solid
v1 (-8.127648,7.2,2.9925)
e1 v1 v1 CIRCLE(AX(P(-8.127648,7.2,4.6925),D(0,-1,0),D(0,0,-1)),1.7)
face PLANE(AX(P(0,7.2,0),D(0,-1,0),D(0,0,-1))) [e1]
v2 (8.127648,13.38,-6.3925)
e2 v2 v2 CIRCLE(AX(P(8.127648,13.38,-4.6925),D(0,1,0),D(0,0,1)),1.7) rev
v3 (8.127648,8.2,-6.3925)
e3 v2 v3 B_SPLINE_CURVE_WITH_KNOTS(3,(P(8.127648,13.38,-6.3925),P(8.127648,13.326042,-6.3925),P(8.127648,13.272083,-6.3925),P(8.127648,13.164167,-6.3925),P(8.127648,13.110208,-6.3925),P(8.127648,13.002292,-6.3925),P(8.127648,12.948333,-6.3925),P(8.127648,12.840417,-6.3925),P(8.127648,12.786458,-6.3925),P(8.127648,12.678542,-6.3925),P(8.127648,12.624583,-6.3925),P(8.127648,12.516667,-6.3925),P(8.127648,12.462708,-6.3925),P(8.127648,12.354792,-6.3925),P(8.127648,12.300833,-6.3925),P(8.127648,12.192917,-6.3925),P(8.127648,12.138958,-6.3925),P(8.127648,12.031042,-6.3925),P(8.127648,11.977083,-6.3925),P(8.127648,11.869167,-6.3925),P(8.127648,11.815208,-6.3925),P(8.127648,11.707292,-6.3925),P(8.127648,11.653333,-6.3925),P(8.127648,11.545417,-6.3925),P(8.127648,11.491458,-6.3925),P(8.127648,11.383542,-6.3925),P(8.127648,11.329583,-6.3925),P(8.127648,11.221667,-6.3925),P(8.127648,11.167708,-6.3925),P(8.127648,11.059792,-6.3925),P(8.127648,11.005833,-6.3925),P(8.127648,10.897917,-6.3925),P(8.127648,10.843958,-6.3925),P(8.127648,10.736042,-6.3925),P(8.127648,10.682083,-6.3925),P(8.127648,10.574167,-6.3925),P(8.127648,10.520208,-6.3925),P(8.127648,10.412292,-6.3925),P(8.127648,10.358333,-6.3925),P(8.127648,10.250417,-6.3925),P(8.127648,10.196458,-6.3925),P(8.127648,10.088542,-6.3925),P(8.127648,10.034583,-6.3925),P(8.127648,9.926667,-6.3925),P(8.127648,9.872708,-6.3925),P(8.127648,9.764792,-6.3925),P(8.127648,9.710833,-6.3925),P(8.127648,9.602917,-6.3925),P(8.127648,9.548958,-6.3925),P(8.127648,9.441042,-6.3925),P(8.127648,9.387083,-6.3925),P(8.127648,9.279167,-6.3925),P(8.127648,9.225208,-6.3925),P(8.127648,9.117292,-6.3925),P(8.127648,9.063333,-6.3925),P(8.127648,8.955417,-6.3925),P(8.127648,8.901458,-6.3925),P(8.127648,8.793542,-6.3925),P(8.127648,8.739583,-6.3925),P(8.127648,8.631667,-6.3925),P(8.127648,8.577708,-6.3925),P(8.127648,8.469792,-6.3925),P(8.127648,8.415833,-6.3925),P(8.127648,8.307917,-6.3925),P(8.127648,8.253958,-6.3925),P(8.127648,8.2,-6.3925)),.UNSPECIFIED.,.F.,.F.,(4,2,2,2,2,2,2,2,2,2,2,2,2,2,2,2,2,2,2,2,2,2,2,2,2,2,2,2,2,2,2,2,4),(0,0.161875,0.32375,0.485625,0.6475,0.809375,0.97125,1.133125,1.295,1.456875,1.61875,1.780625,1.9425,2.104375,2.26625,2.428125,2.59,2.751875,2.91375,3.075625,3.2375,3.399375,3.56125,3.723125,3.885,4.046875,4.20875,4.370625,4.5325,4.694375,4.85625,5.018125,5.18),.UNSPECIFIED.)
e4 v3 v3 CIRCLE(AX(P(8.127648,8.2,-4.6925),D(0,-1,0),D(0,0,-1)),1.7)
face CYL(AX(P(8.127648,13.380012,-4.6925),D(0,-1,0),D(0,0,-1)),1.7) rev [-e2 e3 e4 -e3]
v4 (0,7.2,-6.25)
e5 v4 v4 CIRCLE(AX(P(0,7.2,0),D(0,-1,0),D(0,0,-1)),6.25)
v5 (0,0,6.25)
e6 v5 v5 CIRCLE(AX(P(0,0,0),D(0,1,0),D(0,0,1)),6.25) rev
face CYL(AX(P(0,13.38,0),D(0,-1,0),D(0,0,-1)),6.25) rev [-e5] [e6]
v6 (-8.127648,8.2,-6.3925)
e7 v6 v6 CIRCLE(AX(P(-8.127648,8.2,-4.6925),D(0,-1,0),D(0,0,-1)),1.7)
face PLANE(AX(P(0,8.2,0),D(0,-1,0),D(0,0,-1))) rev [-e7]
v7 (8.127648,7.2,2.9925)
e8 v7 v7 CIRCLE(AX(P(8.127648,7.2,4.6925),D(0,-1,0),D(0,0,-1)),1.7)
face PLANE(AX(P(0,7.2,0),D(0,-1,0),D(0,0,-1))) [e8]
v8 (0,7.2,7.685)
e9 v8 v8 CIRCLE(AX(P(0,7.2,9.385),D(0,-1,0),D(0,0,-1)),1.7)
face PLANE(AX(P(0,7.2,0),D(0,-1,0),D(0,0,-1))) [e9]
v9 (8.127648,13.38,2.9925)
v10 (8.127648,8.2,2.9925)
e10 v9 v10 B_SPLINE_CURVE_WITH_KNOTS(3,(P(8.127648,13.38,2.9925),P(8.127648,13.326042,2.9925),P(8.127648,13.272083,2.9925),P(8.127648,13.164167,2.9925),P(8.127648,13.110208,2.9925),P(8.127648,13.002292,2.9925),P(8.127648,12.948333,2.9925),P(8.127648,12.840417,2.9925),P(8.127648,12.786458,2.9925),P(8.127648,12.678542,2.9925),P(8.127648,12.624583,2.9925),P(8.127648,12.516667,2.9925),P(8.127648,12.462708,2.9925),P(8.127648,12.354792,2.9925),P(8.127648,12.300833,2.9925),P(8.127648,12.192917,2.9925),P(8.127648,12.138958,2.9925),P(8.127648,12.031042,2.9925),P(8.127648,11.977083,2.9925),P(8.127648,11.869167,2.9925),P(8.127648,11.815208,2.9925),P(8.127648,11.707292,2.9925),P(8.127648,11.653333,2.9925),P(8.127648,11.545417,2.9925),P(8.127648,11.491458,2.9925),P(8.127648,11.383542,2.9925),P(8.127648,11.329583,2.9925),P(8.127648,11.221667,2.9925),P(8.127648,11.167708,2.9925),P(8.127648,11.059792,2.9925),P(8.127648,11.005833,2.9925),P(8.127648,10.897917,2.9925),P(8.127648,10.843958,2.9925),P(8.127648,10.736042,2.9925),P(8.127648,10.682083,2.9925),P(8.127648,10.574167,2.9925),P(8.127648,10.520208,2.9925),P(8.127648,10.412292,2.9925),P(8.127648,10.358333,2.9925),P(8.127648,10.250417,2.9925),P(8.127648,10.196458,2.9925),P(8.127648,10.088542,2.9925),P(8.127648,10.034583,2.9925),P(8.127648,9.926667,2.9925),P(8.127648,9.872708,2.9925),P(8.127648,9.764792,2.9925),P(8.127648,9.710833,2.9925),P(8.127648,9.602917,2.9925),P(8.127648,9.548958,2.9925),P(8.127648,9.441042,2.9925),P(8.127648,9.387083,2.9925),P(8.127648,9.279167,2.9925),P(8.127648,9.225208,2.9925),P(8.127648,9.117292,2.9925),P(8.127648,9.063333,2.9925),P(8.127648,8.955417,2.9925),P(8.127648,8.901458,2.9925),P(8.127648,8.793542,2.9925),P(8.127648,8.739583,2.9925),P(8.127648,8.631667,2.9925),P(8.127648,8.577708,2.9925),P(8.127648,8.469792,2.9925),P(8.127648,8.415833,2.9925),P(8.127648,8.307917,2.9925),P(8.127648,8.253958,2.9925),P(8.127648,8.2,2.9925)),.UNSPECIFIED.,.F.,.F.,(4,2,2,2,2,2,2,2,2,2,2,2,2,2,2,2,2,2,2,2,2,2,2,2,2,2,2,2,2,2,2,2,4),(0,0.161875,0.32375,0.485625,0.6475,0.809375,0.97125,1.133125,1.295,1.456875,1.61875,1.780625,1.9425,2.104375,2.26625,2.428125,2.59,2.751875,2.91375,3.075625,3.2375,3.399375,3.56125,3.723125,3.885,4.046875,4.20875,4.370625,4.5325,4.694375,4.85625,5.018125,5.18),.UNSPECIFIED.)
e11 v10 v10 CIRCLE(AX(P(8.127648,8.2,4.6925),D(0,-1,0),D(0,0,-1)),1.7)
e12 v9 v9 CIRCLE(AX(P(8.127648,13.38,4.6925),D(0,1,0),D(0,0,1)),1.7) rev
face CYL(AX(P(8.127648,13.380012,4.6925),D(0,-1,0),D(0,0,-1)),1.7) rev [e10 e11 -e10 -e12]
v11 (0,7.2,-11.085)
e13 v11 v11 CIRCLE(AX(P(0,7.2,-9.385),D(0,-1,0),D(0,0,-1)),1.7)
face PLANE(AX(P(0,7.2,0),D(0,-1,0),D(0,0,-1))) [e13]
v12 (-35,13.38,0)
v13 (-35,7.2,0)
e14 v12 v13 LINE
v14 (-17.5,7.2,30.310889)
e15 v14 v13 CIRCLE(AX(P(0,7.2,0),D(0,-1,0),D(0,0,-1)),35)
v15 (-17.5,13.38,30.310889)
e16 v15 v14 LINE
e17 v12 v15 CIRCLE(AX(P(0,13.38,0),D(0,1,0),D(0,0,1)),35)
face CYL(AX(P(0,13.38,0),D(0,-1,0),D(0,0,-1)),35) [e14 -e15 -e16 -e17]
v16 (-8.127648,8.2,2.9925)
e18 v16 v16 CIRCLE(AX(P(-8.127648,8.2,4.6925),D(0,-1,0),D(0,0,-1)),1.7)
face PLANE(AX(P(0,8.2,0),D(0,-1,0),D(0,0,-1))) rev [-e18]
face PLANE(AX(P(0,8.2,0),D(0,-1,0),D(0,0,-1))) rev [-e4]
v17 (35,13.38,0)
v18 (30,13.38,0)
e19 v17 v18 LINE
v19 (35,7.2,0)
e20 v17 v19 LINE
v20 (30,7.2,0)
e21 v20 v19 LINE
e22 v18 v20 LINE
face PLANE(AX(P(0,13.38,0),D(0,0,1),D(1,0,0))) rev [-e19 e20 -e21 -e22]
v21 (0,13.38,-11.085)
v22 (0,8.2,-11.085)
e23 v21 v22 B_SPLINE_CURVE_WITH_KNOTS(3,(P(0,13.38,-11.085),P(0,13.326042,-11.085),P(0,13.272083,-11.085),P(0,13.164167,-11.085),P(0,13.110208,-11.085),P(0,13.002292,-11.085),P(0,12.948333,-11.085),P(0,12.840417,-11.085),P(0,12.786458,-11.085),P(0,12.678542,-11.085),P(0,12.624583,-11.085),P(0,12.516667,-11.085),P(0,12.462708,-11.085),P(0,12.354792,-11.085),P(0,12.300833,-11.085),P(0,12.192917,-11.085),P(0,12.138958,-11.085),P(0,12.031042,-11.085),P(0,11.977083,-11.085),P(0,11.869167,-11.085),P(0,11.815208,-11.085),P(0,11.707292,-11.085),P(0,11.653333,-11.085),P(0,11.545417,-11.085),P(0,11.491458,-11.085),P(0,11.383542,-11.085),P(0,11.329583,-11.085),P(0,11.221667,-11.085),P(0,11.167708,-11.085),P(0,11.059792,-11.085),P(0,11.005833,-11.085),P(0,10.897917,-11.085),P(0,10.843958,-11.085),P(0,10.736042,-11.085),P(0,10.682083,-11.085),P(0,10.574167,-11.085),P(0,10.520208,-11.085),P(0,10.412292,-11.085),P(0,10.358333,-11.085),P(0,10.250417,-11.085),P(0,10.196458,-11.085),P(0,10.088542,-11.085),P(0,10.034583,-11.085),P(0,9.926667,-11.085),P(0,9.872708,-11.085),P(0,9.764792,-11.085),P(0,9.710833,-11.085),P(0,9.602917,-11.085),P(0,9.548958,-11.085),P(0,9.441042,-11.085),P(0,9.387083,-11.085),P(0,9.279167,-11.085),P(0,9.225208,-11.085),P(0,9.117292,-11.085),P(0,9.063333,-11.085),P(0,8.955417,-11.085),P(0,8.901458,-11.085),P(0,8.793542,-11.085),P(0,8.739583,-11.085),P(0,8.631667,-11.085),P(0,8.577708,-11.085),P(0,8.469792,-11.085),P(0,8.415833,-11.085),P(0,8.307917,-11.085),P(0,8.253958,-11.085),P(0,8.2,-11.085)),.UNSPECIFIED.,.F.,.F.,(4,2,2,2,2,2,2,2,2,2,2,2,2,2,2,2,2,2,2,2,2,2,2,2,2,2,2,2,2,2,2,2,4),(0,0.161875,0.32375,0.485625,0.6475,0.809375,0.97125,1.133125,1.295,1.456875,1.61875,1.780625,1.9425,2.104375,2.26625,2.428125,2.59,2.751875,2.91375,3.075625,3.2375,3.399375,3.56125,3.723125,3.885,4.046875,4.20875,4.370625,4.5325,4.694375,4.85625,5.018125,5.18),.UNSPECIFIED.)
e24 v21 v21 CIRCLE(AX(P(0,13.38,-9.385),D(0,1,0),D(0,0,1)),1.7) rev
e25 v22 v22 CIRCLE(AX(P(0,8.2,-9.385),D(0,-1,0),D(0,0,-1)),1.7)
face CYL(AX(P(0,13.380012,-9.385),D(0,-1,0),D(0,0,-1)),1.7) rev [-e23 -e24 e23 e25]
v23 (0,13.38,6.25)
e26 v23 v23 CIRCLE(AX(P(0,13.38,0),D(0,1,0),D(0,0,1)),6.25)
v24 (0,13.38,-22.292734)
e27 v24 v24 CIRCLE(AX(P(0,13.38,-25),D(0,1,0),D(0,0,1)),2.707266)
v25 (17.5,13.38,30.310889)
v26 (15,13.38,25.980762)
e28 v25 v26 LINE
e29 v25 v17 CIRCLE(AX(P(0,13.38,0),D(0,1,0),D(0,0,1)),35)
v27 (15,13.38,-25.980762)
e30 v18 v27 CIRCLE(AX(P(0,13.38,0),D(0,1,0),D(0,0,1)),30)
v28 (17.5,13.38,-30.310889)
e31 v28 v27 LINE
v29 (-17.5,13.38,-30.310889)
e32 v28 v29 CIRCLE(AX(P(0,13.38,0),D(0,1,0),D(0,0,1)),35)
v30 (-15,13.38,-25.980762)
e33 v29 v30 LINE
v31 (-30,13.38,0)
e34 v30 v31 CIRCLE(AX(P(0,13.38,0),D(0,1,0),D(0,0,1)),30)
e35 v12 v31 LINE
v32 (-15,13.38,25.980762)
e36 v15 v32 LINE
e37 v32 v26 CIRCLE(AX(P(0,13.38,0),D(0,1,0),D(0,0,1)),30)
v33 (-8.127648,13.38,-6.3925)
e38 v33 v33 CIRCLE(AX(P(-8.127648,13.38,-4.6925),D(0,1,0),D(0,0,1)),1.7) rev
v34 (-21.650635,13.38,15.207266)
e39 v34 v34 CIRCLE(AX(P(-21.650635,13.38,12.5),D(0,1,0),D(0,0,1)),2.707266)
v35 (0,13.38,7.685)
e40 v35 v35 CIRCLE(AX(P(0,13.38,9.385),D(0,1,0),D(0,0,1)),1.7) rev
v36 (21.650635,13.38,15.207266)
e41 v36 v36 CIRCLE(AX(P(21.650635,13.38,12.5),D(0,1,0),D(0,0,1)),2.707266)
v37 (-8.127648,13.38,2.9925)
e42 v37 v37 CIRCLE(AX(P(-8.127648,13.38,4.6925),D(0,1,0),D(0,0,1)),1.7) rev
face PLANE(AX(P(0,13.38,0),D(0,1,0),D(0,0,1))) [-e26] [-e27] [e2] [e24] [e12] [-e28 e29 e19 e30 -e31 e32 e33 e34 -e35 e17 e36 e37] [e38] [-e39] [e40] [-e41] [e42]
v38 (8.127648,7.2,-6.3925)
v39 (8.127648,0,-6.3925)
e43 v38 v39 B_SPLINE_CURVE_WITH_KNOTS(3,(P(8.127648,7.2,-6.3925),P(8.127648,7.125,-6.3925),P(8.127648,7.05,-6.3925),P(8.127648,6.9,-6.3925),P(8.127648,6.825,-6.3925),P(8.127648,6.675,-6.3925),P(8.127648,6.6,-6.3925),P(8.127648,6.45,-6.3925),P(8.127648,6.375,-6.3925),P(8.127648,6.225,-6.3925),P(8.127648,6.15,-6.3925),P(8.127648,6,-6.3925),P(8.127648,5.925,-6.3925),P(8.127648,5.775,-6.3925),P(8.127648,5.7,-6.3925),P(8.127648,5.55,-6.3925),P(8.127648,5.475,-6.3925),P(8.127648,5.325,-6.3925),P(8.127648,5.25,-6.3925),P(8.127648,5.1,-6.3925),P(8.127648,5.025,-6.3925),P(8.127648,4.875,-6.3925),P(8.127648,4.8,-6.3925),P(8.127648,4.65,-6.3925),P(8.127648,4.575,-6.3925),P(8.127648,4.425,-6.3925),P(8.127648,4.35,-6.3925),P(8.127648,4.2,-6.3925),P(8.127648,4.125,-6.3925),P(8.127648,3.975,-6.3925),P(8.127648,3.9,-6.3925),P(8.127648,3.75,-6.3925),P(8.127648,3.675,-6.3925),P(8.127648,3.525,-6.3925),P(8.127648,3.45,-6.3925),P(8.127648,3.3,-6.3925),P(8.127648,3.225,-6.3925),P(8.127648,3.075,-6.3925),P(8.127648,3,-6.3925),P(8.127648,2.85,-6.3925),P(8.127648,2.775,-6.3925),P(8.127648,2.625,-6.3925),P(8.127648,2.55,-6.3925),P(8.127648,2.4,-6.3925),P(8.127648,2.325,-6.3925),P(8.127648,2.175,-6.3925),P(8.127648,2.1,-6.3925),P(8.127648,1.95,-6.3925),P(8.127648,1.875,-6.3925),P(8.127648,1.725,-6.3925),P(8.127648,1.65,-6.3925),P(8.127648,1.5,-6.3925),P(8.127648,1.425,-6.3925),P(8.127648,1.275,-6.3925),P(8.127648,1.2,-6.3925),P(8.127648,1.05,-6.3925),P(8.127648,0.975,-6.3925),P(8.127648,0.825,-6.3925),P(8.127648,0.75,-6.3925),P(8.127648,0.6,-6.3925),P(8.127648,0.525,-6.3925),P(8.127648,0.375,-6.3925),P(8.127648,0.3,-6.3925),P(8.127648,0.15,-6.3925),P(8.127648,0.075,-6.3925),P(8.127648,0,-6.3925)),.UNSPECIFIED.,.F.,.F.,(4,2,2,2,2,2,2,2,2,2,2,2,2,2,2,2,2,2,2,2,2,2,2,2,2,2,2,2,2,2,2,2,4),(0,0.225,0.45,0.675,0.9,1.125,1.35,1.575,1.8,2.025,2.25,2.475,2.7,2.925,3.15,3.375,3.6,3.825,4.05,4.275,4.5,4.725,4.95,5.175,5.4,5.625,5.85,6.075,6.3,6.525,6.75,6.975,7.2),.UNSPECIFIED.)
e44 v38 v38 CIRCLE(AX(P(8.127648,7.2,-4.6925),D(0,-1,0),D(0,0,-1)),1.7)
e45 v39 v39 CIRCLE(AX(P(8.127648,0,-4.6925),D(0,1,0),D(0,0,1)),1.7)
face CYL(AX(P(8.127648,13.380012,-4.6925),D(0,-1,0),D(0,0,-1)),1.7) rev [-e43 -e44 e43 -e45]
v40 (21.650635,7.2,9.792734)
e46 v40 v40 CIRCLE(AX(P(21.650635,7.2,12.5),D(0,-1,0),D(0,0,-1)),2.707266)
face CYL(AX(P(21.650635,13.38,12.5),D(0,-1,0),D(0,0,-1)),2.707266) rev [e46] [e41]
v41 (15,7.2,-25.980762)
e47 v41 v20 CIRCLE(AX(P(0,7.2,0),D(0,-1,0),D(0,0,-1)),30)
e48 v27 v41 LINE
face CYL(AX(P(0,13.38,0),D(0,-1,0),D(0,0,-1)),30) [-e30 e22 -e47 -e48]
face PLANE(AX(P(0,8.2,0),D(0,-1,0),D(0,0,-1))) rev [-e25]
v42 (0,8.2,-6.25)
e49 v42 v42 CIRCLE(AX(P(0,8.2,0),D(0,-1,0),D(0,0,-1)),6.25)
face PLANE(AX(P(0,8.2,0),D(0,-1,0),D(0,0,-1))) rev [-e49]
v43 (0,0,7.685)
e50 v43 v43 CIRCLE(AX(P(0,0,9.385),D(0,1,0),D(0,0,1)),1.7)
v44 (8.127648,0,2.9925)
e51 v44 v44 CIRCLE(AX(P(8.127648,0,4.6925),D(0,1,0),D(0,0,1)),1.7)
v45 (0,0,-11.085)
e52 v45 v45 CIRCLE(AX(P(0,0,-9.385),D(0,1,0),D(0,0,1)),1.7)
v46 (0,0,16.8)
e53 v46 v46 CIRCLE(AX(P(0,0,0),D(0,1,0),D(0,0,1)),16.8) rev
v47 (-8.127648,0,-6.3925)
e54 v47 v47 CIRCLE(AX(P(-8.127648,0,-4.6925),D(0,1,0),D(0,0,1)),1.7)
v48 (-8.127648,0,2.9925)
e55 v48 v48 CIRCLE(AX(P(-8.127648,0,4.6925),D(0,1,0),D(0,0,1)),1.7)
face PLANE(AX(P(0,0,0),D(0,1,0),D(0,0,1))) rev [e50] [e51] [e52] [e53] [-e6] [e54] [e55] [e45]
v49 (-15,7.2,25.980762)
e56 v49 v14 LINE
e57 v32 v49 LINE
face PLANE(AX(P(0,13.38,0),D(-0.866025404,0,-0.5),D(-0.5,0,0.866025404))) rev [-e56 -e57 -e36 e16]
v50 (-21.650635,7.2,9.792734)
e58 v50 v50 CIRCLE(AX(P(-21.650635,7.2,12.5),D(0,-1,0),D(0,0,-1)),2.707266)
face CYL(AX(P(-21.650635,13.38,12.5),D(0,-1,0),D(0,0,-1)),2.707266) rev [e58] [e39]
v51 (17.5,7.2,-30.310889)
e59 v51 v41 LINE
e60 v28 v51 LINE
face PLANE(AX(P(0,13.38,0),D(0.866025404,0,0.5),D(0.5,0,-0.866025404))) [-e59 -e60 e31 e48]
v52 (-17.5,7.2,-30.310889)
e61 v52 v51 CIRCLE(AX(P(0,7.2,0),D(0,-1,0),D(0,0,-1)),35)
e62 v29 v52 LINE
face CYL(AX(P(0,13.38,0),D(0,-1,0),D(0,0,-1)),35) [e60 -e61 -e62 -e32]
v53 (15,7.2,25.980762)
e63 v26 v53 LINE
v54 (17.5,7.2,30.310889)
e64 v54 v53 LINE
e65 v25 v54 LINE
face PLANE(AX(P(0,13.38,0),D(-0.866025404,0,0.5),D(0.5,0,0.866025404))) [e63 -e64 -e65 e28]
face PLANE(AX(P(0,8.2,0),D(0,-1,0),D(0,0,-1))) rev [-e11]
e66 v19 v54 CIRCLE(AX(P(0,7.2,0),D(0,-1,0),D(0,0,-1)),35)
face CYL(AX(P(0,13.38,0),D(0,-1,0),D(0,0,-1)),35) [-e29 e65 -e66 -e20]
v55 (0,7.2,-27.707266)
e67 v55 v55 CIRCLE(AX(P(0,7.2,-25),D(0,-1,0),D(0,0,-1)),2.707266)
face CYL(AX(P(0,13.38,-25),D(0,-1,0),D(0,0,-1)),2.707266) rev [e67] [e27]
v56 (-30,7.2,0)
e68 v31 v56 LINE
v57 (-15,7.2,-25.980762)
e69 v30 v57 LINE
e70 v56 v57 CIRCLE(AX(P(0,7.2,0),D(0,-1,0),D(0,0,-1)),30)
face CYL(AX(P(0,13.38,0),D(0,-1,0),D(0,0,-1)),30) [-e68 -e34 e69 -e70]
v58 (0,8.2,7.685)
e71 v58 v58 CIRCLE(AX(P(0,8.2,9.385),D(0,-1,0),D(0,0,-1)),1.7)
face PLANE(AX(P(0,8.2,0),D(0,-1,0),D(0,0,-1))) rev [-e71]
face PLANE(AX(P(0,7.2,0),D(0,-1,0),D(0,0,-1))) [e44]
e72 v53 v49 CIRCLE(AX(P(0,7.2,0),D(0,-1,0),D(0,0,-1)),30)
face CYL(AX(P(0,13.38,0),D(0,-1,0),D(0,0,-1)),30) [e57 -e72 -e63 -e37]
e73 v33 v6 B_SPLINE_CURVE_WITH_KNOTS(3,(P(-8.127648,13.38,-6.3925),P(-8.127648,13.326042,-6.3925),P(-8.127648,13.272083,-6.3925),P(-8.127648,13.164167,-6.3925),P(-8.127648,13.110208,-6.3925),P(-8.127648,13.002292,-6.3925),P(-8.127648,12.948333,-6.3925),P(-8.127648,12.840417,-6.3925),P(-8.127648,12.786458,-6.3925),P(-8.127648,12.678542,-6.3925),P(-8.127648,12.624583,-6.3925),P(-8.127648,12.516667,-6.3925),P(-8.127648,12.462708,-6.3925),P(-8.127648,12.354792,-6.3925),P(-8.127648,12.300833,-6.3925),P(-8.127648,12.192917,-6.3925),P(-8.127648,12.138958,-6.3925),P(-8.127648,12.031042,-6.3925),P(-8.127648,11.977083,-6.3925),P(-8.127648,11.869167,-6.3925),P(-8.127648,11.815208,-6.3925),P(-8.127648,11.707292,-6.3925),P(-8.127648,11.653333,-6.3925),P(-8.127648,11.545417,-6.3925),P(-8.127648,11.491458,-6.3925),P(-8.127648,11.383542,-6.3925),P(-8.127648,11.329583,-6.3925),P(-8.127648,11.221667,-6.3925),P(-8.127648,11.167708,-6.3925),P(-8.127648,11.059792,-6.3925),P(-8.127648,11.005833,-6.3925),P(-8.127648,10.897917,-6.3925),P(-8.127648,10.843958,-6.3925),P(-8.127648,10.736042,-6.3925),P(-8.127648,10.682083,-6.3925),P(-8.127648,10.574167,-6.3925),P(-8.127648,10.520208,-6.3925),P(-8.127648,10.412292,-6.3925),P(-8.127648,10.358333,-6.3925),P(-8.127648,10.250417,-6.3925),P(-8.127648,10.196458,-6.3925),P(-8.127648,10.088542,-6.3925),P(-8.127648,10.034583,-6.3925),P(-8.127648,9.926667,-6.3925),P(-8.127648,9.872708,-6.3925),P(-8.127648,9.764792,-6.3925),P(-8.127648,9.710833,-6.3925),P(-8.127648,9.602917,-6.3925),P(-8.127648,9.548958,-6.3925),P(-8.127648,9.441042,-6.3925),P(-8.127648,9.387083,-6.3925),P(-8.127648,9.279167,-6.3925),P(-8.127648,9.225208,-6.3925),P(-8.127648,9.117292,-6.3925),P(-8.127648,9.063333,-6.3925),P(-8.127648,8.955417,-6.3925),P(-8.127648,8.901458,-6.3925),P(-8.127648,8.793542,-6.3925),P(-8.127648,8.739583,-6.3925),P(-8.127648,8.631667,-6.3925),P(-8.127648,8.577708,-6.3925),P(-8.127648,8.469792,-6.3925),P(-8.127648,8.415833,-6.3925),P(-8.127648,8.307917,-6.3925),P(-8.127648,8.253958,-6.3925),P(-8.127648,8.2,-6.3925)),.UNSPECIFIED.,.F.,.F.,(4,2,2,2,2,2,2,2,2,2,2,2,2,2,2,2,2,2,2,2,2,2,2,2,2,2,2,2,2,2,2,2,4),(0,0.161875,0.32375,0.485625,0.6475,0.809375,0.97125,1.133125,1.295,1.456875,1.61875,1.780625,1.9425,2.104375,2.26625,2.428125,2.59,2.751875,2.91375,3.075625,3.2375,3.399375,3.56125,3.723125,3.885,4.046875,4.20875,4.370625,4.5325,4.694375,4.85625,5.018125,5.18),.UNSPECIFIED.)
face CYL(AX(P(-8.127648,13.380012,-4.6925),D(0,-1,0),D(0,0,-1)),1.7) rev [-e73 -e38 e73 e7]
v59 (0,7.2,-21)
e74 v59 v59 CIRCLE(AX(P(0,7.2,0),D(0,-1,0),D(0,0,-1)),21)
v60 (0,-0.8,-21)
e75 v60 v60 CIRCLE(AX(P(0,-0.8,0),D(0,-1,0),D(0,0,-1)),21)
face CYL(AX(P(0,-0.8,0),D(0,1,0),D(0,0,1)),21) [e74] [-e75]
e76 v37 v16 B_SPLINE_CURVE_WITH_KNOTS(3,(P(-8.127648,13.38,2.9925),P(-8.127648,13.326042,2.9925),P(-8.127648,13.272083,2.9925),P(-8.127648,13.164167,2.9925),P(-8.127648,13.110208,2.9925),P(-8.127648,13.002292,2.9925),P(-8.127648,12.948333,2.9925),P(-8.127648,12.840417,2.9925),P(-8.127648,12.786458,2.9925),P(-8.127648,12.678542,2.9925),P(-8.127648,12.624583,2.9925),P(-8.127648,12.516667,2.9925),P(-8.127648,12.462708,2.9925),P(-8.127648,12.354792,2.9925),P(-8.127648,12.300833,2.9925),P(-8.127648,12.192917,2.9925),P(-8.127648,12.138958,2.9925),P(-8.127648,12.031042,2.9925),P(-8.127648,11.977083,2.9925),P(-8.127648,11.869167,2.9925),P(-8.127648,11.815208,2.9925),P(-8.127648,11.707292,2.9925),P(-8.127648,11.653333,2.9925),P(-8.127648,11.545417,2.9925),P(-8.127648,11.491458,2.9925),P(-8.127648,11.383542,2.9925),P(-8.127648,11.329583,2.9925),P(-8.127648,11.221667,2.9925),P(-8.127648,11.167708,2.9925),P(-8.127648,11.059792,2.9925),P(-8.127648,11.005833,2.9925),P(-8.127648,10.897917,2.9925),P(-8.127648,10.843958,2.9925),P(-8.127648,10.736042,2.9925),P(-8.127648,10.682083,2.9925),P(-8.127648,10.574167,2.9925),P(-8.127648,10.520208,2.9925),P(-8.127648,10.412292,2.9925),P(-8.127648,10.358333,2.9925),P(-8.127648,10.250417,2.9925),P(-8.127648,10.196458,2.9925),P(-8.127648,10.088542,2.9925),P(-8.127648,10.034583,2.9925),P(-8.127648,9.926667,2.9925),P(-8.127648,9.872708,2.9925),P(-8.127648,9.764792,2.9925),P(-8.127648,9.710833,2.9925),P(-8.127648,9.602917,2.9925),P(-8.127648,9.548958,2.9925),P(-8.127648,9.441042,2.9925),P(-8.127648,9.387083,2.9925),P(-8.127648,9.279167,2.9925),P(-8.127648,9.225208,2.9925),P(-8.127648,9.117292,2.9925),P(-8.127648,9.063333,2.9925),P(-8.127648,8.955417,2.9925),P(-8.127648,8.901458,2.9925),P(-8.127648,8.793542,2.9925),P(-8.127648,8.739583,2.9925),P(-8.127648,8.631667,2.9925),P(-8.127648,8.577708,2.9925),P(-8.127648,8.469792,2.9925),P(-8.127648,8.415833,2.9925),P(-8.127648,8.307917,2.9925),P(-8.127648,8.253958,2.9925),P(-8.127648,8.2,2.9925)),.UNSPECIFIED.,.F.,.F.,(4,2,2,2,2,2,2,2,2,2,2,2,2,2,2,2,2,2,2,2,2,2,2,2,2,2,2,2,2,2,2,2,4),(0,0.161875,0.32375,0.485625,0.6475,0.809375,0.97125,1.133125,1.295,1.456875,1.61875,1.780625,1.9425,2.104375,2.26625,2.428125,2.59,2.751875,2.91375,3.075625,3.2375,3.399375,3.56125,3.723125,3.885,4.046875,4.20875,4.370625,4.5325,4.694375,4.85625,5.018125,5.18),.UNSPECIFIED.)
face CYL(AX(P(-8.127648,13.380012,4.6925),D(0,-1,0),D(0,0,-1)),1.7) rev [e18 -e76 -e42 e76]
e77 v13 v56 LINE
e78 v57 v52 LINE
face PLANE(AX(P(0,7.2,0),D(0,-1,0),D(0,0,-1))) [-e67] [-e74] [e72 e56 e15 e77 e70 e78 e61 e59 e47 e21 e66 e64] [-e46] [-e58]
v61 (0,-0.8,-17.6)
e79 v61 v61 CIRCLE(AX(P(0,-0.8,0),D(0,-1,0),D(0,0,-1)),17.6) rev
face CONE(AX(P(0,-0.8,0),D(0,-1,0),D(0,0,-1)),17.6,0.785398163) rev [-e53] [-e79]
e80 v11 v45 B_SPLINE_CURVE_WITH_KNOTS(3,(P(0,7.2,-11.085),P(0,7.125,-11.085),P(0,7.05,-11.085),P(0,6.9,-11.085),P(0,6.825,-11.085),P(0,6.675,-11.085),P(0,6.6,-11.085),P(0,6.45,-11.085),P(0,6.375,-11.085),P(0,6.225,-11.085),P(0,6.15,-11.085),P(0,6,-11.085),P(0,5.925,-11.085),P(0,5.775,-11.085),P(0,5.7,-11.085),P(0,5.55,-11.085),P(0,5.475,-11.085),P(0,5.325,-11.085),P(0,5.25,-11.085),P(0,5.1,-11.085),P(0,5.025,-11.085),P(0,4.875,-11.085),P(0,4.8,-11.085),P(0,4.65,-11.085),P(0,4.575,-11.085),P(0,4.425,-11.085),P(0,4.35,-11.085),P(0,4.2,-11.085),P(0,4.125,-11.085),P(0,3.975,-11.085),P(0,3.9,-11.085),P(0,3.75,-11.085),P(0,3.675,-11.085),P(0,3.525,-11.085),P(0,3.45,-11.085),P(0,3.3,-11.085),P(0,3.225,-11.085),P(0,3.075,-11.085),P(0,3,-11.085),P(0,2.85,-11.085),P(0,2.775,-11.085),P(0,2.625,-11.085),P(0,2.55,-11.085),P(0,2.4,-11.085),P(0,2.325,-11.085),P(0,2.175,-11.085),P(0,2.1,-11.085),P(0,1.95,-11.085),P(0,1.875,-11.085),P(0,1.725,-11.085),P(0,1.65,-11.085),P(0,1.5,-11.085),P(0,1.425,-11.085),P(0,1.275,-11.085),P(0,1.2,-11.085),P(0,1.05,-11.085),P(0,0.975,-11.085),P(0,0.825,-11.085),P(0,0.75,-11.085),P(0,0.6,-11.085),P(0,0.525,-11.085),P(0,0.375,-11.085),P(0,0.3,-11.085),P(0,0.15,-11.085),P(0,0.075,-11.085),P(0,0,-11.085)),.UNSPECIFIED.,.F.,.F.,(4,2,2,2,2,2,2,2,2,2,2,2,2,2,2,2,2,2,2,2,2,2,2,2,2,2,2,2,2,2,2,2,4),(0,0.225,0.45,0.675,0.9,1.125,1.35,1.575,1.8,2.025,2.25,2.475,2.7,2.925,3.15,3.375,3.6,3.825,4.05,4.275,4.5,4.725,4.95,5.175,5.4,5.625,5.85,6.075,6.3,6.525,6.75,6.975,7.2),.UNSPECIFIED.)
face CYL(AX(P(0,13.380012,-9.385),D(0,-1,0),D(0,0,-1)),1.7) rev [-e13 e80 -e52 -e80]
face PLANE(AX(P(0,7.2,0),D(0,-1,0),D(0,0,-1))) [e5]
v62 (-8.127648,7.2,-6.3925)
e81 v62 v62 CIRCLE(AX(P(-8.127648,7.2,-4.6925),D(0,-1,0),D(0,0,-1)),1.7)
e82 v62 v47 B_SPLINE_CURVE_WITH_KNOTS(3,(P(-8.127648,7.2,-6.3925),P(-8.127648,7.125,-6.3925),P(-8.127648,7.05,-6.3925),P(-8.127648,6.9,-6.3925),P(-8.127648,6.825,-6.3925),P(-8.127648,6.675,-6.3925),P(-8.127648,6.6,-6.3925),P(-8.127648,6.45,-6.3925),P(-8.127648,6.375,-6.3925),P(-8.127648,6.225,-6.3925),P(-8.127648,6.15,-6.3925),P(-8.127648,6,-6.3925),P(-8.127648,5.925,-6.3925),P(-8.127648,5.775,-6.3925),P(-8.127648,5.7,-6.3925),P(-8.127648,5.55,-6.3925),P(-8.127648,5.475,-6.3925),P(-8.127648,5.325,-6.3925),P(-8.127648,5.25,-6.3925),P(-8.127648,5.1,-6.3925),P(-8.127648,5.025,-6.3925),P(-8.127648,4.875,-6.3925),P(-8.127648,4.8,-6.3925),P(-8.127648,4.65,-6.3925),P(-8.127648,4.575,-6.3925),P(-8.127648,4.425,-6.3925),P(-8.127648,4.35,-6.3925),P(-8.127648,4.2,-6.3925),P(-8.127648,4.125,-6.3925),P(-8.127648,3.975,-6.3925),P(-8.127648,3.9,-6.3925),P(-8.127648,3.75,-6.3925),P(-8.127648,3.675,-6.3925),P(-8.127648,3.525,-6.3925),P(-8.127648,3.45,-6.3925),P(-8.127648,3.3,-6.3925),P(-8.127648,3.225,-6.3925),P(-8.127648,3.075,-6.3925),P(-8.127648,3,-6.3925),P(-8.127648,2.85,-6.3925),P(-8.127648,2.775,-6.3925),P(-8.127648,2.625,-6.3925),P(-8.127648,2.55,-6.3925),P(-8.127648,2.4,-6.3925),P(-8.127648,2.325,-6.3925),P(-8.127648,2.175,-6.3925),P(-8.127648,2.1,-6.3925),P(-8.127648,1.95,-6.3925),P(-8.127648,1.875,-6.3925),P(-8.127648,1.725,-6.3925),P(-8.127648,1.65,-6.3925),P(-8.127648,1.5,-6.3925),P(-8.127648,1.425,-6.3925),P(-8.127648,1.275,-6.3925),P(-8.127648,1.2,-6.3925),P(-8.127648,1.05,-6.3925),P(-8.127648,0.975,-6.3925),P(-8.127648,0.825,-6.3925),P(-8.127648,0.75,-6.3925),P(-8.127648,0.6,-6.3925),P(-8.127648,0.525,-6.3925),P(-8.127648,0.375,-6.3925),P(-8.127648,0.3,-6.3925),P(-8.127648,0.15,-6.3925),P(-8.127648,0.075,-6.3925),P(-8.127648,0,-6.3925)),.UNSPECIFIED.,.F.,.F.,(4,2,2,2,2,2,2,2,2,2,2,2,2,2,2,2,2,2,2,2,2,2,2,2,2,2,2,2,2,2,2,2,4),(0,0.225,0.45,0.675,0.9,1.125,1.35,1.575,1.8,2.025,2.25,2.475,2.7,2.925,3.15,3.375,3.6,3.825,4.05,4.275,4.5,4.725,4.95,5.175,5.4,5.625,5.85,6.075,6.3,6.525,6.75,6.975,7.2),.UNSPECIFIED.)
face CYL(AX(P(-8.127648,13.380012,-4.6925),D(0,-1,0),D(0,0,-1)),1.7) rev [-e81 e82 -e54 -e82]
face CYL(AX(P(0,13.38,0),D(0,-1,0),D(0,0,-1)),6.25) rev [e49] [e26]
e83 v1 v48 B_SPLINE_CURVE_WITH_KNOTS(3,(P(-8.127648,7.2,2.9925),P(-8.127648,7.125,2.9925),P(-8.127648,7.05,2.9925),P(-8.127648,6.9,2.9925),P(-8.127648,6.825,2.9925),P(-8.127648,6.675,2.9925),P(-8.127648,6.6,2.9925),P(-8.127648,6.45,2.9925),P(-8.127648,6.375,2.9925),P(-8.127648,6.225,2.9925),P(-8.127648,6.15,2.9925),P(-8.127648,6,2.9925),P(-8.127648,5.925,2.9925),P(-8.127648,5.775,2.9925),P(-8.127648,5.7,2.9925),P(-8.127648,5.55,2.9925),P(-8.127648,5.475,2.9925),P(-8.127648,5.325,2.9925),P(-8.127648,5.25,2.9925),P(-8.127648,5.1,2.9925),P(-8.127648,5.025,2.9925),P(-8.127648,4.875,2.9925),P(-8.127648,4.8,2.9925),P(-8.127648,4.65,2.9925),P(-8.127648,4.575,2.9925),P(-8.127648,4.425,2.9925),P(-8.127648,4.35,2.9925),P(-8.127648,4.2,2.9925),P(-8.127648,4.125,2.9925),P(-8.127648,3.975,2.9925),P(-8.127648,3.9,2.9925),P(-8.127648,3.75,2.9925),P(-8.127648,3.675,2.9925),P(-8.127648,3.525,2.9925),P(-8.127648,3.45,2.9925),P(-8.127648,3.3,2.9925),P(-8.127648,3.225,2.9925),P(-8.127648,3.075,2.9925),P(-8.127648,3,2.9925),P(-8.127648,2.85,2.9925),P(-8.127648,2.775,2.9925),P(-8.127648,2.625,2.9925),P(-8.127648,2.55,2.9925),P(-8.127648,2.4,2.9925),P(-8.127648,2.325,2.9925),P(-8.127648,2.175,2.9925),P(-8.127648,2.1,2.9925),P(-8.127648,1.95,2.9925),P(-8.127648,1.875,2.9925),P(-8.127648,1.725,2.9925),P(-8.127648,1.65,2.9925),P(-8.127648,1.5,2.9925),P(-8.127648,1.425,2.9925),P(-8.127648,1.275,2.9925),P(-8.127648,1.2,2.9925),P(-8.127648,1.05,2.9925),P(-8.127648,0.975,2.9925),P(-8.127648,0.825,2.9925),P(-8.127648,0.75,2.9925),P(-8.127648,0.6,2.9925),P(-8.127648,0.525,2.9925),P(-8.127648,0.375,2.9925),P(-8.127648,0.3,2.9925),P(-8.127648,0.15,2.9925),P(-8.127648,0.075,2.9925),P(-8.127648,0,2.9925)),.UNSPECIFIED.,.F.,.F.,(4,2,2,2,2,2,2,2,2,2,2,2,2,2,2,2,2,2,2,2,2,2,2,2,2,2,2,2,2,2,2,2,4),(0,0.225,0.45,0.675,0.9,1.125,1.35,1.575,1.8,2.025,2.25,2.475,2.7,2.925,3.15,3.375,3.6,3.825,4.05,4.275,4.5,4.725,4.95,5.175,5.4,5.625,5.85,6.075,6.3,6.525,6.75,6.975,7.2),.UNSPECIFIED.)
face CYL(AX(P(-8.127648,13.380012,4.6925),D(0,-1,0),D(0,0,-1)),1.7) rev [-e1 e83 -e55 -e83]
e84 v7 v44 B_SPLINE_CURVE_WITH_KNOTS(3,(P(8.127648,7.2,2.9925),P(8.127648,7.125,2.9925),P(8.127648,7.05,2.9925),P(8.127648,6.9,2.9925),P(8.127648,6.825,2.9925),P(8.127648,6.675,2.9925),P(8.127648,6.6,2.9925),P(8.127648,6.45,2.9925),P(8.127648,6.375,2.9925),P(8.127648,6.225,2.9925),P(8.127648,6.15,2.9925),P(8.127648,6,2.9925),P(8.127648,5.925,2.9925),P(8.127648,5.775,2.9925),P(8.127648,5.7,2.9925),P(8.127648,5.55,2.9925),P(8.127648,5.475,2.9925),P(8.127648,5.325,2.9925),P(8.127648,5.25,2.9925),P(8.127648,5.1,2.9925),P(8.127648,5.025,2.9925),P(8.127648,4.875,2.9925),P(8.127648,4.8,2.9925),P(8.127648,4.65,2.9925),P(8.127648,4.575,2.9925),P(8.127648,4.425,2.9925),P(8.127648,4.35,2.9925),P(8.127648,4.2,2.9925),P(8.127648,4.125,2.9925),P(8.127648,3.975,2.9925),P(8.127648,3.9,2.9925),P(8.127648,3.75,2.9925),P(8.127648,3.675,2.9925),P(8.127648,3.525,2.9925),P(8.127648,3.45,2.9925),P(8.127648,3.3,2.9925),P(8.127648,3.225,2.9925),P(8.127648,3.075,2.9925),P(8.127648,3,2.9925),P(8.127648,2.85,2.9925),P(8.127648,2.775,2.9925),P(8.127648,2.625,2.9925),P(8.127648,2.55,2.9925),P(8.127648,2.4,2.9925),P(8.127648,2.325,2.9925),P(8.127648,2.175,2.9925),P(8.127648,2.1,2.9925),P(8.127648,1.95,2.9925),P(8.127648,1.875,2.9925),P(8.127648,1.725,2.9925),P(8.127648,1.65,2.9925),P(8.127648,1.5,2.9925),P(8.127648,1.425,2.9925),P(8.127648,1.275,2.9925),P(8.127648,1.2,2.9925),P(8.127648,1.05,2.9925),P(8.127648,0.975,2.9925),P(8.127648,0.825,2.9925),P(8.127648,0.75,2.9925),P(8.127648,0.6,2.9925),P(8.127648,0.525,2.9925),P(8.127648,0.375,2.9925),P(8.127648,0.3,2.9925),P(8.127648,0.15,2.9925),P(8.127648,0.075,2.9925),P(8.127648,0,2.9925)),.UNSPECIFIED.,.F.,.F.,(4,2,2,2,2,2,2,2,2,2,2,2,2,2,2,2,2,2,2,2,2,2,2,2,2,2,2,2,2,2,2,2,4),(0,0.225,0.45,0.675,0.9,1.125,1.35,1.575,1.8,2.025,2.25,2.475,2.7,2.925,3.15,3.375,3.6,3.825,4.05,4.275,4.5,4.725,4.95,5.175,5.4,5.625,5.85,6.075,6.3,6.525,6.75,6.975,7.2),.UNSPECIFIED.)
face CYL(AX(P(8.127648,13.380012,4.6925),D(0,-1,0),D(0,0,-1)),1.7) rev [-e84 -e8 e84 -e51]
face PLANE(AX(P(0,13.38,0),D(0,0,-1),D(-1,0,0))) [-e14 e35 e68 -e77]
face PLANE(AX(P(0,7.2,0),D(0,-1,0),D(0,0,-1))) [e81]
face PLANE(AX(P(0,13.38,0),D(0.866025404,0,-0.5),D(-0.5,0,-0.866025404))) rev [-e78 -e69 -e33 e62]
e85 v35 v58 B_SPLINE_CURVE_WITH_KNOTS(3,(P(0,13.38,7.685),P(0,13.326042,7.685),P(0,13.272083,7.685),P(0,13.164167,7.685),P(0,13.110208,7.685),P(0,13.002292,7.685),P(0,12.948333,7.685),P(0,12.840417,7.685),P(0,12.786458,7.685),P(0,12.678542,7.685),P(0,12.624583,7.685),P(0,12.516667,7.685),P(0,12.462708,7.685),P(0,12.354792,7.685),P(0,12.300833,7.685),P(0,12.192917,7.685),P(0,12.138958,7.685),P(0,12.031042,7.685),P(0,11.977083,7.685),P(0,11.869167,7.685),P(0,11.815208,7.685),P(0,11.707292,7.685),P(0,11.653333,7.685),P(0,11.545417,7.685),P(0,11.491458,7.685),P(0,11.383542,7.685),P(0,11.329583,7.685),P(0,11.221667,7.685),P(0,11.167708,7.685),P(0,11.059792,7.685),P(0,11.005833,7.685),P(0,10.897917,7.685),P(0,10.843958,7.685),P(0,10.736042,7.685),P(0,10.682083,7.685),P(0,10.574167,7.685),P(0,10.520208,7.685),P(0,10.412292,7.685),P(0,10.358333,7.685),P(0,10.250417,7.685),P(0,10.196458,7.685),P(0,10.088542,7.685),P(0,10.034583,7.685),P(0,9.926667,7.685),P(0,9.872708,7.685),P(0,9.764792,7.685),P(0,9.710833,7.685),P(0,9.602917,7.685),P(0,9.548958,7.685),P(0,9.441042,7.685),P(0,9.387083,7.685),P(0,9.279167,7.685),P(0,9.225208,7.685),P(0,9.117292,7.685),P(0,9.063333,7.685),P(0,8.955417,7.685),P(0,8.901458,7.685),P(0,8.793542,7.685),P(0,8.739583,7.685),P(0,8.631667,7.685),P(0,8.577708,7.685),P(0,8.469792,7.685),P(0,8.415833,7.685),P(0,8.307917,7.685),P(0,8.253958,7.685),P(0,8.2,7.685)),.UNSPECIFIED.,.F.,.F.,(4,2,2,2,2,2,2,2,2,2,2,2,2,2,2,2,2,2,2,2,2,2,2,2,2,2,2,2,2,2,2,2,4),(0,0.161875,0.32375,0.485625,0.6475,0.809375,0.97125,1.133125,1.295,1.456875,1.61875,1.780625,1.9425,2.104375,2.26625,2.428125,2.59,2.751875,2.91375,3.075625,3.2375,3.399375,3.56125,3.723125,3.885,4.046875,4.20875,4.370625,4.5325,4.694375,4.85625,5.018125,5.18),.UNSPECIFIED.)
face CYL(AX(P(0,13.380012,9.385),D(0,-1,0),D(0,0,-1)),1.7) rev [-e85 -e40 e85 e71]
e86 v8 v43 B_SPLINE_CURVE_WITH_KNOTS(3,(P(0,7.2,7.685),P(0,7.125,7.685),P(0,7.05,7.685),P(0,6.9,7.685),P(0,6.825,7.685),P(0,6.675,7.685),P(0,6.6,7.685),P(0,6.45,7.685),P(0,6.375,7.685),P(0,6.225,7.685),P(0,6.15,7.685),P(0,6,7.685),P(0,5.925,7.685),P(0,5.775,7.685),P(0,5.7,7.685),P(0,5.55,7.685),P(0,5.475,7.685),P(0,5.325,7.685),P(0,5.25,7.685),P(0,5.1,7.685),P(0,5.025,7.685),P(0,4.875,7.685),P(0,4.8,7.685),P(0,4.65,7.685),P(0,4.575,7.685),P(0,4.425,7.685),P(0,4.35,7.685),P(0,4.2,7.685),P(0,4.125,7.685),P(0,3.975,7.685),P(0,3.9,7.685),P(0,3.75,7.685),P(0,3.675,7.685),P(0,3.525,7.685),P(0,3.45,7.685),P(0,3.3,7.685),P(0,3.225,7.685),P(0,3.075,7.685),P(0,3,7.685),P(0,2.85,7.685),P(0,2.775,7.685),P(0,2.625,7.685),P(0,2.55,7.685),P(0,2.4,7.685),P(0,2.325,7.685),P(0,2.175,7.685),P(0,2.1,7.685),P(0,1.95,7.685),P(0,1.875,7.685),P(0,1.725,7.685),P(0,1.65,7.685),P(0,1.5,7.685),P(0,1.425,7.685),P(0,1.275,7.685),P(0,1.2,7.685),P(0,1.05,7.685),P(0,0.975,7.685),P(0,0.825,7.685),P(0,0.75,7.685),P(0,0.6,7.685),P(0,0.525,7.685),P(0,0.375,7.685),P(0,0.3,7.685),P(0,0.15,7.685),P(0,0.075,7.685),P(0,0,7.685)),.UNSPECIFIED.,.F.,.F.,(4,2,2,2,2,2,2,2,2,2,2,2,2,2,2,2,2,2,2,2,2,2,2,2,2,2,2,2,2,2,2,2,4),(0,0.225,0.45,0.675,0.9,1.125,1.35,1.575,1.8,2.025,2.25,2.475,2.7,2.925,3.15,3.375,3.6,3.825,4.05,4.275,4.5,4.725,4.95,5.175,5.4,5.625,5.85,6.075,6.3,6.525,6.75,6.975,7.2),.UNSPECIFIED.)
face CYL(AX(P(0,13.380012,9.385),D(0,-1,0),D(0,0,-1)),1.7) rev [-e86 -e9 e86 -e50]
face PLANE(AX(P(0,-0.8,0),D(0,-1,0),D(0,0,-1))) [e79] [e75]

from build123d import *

# Parameters (mm, degrees)
SKETCH7_W               = 22.627416998
SKETCH7_H               = 22.627416998
SKETCH7_R               = 16.1
BOSS_EXTRUDE2_DEPTH     = 8.2
SKETCH1_R               = 2.707265749
SKETCH1_R_2             = 6.25
BOSS_EXTRUDE1_DEPTH     = 5.18
CUT_EXTRUDE1_DEPTH      = 52.274012911
CUT_EXTRUDE1_DEPTH_BACK = 52.274012911
SKETCH6_R               = 1.7
SKETCH9_R               = 2.707265749
SKETCH9_R_2             = 6.25
SKETCH9_R_3             = 1.7
CUT_EXTRUDE2_DEPTH      = 52.274012911
BOSS_EXTRUDE3_START     = 9
SKETCH10_R              = 21
SKETCH10_R_2            = 16.1
BOSS_EXTRUDE3_DEPTH     = 9
CHAMFER1_SIZE           = 1.5
BOSS_EXTRUDE4_START     = 1
SKETCH11_R              = 2.707265749
BOSS_EXTRUDE4_DEPTH     = 1


with BuildPart() as part:
    # Sketch7 → Boss-Extrude2 (new body)
    with BuildSketch(Plane(origin=(0, 0, 0), x_dir=(1, 0, 0), z_dir=(0, 1, 0))):
        Rectangle(SKETCH7_W, SKETCH7_H)
        with Locations(Location((0, 0, 0), (0, 0, 270))):
            Circle(SKETCH7_R)
        Rectangle(SKETCH7_W, SKETCH7_H)
    extrude(amount=BOSS_EXTRUDE2_DEPTH)

    # Sketch1 → Boss-Extrude1 (add)
    with BuildSketch(Plane(origin=(0, 8.2, 0), x_dir=(1, 0, 0), z_dir=(0, 1, 0))):
        with BuildLine():
            Line((15, 25.980762114), (17.5, 30.310889132))
            ThreePointArc((17.5, 30.310889132), (0, 35), (-17.5, 30.310889132))
            Line((-17.5, 30.310889132), (-15, 25.980762114))
            ThreePointArc((-15, 25.980762114), (-25.980762114, 15), (-30, 0))
            Line((-30, 0), (-35, 0))
            ThreePointArc((-35, 0), (-30.310889132, -17.5), (-17.5, -30.310889132))
            Line((-17.5, -30.310889132), (-15, -25.980762114))
            ThreePointArc((-15, -25.980762114), (0, -30), (15, -25.980762114))
            Line((15, -25.980762114), (17.5, -30.310889132))
            ThreePointArc((17.5, -30.310889132), (30.310889132, -17.5), (35, 0))
            Line((35, 0), (30, 0))
            ThreePointArc((30, 0), (25.980762114, 15), (15, 25.980762114))
        make_face()
        with Locations(Location((21.650635095, -12.5, 0), (0, 0, 270))):
            Circle(SKETCH1_R, mode=Mode.SUBTRACT)
        with Locations(Location((-21.650635095, -12.5, 0), (0, 0, 270))):
            Circle(SKETCH1_R, mode=Mode.SUBTRACT)
        with Locations(Location((0, 0, 0), (0, 0, 270))):
            Circle(SKETCH1_R_2, mode=Mode.SUBTRACT)
        with Locations(Location((0, 25, 0), (0, 0, 270))):
            Circle(SKETCH1_R, mode=Mode.SUBTRACT)
    extrude(amount=BOSS_EXTRUDE1_DEPTH)

    # Sketch6 → Cut-Extrude1 (cut, two sides: drawn at the far end of the back side and taken through both)
    with BuildSketch(Plane(origin=(0, 13.38, 0), x_dir=(1, 0, 0), z_dir=(0, 1, 0)).offset(-CUT_EXTRUDE1_DEPTH_BACK)):
        with Locations(Location((0, -9.385, 0), (0, 0, 90))):
            Circle(SKETCH6_R)
        with Locations(Location((-8.127648415, -4.6925, 0), (0, 0, 90))):
            Circle(SKETCH6_R)
        with Locations(Location((-8.127648415, 4.6925, 0), (0, 0, 90))):
            Circle(SKETCH6_R)
        with Locations(Location((0, 9.385, 0), (0, 0, 90))):
            Circle(SKETCH6_R)
        with Locations(Location((8.127648415, 4.6925, 0), (0, 0, 90))):
            Circle(SKETCH6_R)
        with Locations(Location((8.127648415, -4.6925, 0), (0, 0, 90))):
            Circle(SKETCH6_R)
    extrude(amount=CUT_EXTRUDE1_DEPTH + CUT_EXTRUDE1_DEPTH_BACK, mode=Mode.SUBTRACT)

    # Sketch9 → Cut-Extrude2 (cut, through all)
    with BuildSketch(Plane(origin=(0, 13.38, 0), x_dir=(1, 0, 0), z_dir=(0, 1, 0))):
        with Locations(Location((-21.650635095, -12.5, 0), (0, 0, 270))):
            Circle(SKETCH9_R)
        with Locations(Location((0, 0, 0), (0, 0, 270))):
            Circle(SKETCH9_R_2)
        with Locations(Location((21.650635095, -12.5, 0), (0, 0, 270))):
            Circle(SKETCH9_R)
        with Locations(Location((0, 25, 0), (0, 0, 270))):
            Circle(SKETCH9_R)
        with Locations(Location((8.127648415, -4.6925, 0), (0, 0, 90))):
            Circle(SKETCH9_R_3)
        with Locations(Location((8.127648415, 4.6925, 0), (0, 0, 90))):
            Circle(SKETCH9_R_3)
        with Locations(Location((0, 9.385, 0), (0, 0, 90))):
            Circle(SKETCH9_R_3)
        with Locations(Location((-8.127648415, 4.6925, 0), (0, 0, 90))):
            Circle(SKETCH9_R_3)
        with Locations(Location((-8.127648415, -4.6925, 0), (0, 0, 90))):
            Circle(SKETCH9_R_3)
    extrude(amount=-CUT_EXTRUDE2_DEPTH, mode=Mode.SUBTRACT)

    # Sketch10 → Boss-Extrude3 (add)
    with BuildSketch(Plane.XZ.offset(-8.2).offset(BOSS_EXTRUDE3_START)):
        with Locations(Location((0, 0, 0), (0, 0, 90))):
            Circle(SKETCH10_R)
        with Locations(Location((0, 0, 0), (0, 0, 90))):
            Circle(SKETCH10_R_2, mode=Mode.SUBTRACT)
    extrude(amount=-BOSS_EXTRUDE3_DEPTH)

    # Chamfer1
    # the kernel refuses this chamfer: 1.5 mm, written as the material it takes off along each edge
    with BuildSketch(Plane(origin=(0, -0.8, 0), x_dir=(0, 0, 1), z_dir=(1, 0, 0))) as chamfer1_piece_1_section:
        Polygon((16.1, -CHAMFER1_SIZE), (16.1 + CHAMFER1_SIZE, 0), (16.1, 0), align=None)
    chamfer1_piece_1 = revolve(axis=Axis((0, -0.8, 0), (0, -1, 0)), mode=Mode.PRIVATE)
    chamfer1_piece_1 = split(chamfer1_piece_1, bisect_by=Plane(origin=(0, 0, -17.188347783), z_dir=(0, -1, 0)), keep=Keep.TOP, mode=Mode.PRIVATE)
    add(chamfer1_piece_1, mode=Mode.SUBTRACT)

    # Sketch11 → Boss-Extrude4 (add)
    with BuildSketch(Plane.XZ.offset(-8.2).offset(BOSS_EXTRUDE4_START)):
        with BuildLine():
            Line((-35, 0), (-30, 0))
            ThreePointArc((-30, 0), (-25.980762114, -15), (-15, -25.980762114))
            Line((-15, -25.980762114), (-17.5, -30.310889132))
            ThreePointArc((-17.5, -30.310889132), (0, -35), (17.5, -30.310889132))
            Line((17.5, -30.310889132), (15, -25.980762114))
            ThreePointArc((15, -25.980762114), (25.980762114, -15), (30, 0))
            Line((30, 0), (35, 0))
            ThreePointArc((35, 0), (30.310889132, 17.5), (17.5, 30.310889132))
            Line((17.5, 30.310889132), (15, 25.980762114))
            ThreePointArc((15, 25.980762114), (0, 30), (-15, 25.980762114))
            Line((-15, 25.980762114), (-17.5, 30.310889132))
            ThreePointArc((-17.5, 30.310889132), (-30.310889132, 17.5), (-35, 0))
        make_face()
        with Locations(Location((21.650635095, 12.5, 0), (0, 0, 270))):
            Circle(SKETCH11_R, mode=Mode.SUBTRACT)
        with Locations(Location((0, -25, 0), (0, 0, 270))):
            Circle(SKETCH11_R, mode=Mode.SUBTRACT)
        with Locations(Location((-21.650635095, 12.5, 0), (0, 0, 270))):
            Circle(SKETCH11_R, mode=Mode.SUBTRACT)
    extrude(amount=-BOSS_EXTRUDE4_DEPTH)


solid = part.part
